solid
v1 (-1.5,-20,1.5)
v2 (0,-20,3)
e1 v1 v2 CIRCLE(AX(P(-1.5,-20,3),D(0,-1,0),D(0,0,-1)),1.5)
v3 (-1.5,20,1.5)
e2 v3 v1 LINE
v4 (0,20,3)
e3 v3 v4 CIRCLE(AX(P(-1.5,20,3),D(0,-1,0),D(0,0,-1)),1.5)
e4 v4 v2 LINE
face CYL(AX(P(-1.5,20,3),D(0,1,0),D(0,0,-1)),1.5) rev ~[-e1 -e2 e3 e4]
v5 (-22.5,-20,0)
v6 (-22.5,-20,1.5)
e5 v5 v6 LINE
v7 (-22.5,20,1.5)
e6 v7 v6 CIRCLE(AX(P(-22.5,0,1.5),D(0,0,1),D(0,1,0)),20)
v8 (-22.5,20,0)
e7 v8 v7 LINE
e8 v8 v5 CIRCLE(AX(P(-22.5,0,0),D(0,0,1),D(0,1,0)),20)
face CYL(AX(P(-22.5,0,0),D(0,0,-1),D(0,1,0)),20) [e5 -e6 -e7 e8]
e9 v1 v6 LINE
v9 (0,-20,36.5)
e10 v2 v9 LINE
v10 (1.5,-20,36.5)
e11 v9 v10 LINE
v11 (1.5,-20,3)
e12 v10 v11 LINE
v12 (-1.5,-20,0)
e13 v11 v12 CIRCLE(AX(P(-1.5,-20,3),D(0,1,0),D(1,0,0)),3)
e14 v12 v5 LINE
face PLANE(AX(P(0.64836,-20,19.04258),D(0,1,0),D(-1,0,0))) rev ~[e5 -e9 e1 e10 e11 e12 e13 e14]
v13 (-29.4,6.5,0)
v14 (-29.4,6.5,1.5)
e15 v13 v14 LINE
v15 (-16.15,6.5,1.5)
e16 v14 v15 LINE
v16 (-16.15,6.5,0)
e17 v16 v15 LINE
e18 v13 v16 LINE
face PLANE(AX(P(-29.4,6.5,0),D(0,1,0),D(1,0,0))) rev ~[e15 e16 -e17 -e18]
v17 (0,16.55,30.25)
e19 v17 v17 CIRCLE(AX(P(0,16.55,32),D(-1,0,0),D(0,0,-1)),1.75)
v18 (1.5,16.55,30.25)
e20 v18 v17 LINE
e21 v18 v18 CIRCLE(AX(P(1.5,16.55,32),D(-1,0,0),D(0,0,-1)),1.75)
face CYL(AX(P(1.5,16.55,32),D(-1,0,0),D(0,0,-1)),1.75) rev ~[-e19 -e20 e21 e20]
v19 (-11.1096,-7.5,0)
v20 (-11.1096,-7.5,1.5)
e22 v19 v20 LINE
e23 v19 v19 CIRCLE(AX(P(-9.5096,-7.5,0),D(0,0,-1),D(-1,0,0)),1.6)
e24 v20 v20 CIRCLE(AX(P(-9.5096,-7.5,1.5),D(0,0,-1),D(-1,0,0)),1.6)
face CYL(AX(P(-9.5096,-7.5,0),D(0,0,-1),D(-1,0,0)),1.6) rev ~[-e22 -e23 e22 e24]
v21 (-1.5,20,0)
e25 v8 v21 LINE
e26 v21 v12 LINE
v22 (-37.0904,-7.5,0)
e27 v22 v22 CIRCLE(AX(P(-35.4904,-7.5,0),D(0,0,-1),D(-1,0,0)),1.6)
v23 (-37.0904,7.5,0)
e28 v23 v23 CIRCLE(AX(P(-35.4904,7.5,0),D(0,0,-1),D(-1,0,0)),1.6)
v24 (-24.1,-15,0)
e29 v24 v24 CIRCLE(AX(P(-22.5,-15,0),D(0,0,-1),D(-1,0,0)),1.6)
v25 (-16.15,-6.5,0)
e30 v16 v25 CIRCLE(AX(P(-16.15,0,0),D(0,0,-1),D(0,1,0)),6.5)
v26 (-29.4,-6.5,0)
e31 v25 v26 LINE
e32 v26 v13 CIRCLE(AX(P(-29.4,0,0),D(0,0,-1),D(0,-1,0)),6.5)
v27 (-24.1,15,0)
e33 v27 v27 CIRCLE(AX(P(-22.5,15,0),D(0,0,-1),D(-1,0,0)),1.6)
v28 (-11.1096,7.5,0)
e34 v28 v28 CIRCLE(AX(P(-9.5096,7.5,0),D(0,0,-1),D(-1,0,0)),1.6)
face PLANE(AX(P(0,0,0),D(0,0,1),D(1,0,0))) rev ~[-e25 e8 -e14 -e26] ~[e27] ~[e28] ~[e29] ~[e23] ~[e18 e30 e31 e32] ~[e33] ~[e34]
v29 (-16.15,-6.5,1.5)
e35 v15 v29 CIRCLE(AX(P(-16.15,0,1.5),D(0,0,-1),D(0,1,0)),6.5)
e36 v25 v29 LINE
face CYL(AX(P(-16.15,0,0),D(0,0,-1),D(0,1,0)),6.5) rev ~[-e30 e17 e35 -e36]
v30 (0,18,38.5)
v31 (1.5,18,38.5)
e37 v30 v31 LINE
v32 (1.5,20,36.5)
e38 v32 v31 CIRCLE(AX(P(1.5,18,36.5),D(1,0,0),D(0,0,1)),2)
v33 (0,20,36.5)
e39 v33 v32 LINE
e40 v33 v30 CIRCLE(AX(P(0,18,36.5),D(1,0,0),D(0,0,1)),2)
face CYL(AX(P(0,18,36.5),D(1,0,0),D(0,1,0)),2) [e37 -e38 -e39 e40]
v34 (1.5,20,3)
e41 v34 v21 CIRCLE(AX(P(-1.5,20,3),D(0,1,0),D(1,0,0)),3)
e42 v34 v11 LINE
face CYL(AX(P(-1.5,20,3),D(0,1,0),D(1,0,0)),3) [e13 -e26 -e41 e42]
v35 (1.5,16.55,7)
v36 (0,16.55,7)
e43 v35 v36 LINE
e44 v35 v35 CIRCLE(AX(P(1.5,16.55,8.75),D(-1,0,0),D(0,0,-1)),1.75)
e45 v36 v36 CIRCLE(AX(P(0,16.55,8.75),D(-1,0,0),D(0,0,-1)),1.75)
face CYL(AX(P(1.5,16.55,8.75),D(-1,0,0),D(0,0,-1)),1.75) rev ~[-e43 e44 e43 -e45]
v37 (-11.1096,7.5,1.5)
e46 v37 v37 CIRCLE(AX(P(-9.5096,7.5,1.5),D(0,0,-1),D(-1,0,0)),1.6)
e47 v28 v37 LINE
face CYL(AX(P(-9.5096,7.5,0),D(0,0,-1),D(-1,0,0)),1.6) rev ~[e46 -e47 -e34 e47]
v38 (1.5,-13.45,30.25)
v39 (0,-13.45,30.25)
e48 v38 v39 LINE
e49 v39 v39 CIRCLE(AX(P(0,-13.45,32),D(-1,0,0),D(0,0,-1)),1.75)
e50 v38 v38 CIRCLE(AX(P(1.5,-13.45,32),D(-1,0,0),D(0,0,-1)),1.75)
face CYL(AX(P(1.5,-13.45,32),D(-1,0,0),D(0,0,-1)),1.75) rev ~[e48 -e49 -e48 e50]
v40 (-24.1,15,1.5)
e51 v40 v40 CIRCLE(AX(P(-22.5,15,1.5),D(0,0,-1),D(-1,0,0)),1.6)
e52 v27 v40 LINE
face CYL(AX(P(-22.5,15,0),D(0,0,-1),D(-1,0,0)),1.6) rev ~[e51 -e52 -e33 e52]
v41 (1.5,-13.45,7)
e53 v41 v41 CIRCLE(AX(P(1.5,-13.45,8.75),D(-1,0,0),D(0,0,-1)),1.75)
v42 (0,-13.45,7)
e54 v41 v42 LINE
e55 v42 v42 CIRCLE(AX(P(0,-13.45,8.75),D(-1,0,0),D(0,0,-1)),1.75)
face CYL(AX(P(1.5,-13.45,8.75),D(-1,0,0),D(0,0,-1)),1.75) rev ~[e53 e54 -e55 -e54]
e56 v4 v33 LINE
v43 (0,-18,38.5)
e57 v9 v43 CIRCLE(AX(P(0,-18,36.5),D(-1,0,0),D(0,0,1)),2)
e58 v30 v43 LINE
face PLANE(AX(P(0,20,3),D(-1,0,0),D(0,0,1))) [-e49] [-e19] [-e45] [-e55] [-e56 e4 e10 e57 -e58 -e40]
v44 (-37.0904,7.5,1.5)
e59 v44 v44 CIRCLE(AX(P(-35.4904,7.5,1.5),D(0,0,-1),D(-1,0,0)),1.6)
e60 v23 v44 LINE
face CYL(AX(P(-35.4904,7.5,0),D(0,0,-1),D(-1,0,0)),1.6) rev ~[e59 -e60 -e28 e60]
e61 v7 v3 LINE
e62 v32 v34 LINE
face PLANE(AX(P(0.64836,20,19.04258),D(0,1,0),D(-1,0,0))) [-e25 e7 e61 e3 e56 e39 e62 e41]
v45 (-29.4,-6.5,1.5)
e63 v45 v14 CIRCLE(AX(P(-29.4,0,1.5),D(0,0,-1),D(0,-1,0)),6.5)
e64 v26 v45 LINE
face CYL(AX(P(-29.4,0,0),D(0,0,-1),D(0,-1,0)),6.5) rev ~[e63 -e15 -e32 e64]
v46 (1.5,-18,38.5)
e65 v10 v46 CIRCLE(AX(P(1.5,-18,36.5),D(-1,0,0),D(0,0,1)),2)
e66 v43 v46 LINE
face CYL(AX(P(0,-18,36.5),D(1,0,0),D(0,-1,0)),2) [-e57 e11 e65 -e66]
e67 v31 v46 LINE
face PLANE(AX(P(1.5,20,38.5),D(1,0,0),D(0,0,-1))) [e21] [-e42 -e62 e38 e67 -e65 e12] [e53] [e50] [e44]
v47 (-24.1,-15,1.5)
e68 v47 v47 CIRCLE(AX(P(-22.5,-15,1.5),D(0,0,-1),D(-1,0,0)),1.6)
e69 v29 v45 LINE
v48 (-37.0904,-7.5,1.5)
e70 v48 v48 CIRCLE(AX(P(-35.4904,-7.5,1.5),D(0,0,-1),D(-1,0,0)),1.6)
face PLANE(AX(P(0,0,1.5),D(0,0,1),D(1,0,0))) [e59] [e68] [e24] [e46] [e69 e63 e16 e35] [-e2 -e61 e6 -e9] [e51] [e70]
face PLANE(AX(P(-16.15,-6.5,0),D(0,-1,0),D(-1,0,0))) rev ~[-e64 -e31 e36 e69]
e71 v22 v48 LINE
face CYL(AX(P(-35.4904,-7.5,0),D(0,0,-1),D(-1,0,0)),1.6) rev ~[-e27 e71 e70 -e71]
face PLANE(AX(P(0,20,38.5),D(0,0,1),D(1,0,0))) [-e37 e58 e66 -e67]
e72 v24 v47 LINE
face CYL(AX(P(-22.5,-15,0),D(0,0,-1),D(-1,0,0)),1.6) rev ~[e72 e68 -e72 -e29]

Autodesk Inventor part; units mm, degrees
ref_plane "YZ Plane" through (0, 0, 0) normal (1, 0, 0) x (0, 1, 0)
ref_plane "XZ Plane" through (0, 0, 0) normal (0, 1, 0) x (-1, 0, 0)
ref_plane "XY Plane" through (0, 0, 0) normal (0, 0, 1) x (1, 0, 0)
sketch "Schizzo1" plane through (0, 0, 0) normal (0, 0, 1) x (1, 0, 0)
  line L0 (0, -20) -> (-22.5, -20)
  line L1 (-42.5, -20) -> (-42.5, 0)
  line L2 (-22.5, 20) -> (0, 20)
  line L3 (42.5, -20) -> (-42.5, 20) construction
  line L4 (-42.5, -20) -> (42.5, 20) construction
  arc A0 (-22.5, 20) -> (-22.5, -20) centre (-22.5, 0) ccw
  arc A1 (-2.5356, -1.1932) -> (-2.5356, 1.1932) centre (-22.5, 0) ccw
  line L5 (0, 20) -> (0, -20)
  point P0 (0, 0)
  dimension "d1" = 40
  dimension "d2" = 20
extrude "Piano1" add sketch "Schizzo1" along normal blind 1.5
sketch "Schizzo2" plane through (0, 0, 1.5) normal (0, 0, 1) x (1, 0, 0)
  line L0 (-22.5, 20) -> (0, 20) projected
  point P0 (0, 0)
sketch "Schizzo3" plane through (0, 20, 1.5) normal (1, 0, 0) x (0, 1, 0)
  line L0 (-40, 0) -> (0, 0)
  line L1 (0, 0) -> (0, 37)
  line L2 (0, 37) -> (-40, 37)
  line L3 (-40, 37) -> (-40, 0)
edge flange "Flangia1" height 38.5 angle 90 thickness 1.5 bend radius 1.5 thickness toward (1, 0, 0) relief tear relief width 1.5 relief depth 0.75 edges at (0, 0, 1.5) wall of the first edge with corners at (0, -20, 1.5) (0, 20, 1.5) (0, 20, 38.5) (0, -20, 38.5)
bend "Piega (Bend)1"
corner "Angolo1"
sketch "Schizzo4" plane through (1.5, -20, 38.5) normal (1, 0, 0) x (0, 0, -1)
  circle A0 centre (6.5, 36.55) radius 1.75
  line L0 (0, 0) -> (0, 40) projected
  line L1 (0, 40) -> (35.5, 40) projected
  circle A1 centre (29.75, 36.55) radius 1.75
  circle A2 centre (6.5, 6.55) radius 1.75
  circle A3 centre (29.75, 6.55) radius 1.75
  point P0 (38.5, 20)
  dimension "d15" = 3.5
  dimension "d16" = 6.5
  dimension "d17" = 3.45
  dimension "d18" = 3.5
  dimension "d19" = 23.25
  dimension "d20" = 3.5
  dimension "d21" = 30
  dimension "d22" = 3.5
hole "Foro1" at (1.5, 16.55, 32) at (1.5, 16.55, 8.75) at (1.5, -13.45, 8.75) at (1.5, -13.45, 32) direction (-1, 0, 0) diameter 3.5 depth 1.5 tip angle 118
sketch "Schizzo5" plane through (0, 0, 0) normal (0, 0, -1) x (-1, 0, 0)
  line L0 (16.15, 0) -> (29.4, 0) construction
  line L1 (16.15, -6.5) -> (29.4, -6.5)
  line L2 (29.4, 6.5) -> (16.15, 6.5)
  arc A0 (16.15, 6.5) -> (16.15, -6.5) centre (16.15, 0) ccw
  arc A1 (29.4, -6.5) -> (29.4, 6.5) centre (29.4, 0) ccw
  arc A2 (22.5, -20) -> (22.5, 20) centre (22.5, 0) ccw projected
  circle A3 centre (22.5, -15) radius 1.6
  circle A4 centre (35.4904, -7.5) radius 1.6
  circle A5 centre (35.4904, 7.5) radius 1.6
  circle A6 centre (22.5, 15) radius 1.6
  circle A7 centre (9.5096, 7.5) radius 1.6
  circle A8 centre (9.5096, -7.5) radius 1.6
  point P0 (0, 0)
  point P1 (22.775, 0)
  point P2 (42.5, 0)
  point P3 (35.9, 0)
  dimension "d30" = 13.25
  dimension "d31" = 13
  dimension "d32" = 6.6
  dimension "d33" = 3.2
  dimension "d34" = 15
  dimension "d39" = 360
extrude "Taglia1" cut sketch "Schizzo5" against normal blind 1.5
fillet "Arrotondamento angolo1" radius 2 2 edges at (0.75, 20, 38.5) (0.75, -20, 38.5)
equation "\"d28\" = Spessore"
equation "\"d41\" = Spessore"
equation "\"d3\" = Spessore"
equation "\"d5\" = LarghezzaScaricoPiega"
equation "\"d6\" = ProfonditàScaricoPiega"
equation "\"d7\" = ResiduoMinimo"
equation "\"d8\" = RaggioTransizione"
equation "\"d11\" = RaggioPiega"
equation "\"d12\" = DimensioniScaricoAngolo"
equation "\"d13\" = DimensioneGioco"
equation "\"d14\" = Dimensione_raggio_Jacobi"
equation "\"RaggioPiega\" = Spessore"
equation "\"LarghezzaScaricoPiega\" = Spessore"
equation "\"ProfonditàScaricoPiega\" = 0.5 * Spessore"
equation "\"DimensioniScaricoAngolo\" = 4 * Spessore"
equation "\"ResiduoMinimo\" = 2 * Spessore"
equation "\"RaggioTransizione\" = RaggioPiega"
equation "\"Dimensione_raggio_Jacobi\" = RaggioPiega"
equation "\"DimensioneGioco\" = Spessore"
equation "\"Spessore\" = 1.5"
properties part number "staffa motore"
